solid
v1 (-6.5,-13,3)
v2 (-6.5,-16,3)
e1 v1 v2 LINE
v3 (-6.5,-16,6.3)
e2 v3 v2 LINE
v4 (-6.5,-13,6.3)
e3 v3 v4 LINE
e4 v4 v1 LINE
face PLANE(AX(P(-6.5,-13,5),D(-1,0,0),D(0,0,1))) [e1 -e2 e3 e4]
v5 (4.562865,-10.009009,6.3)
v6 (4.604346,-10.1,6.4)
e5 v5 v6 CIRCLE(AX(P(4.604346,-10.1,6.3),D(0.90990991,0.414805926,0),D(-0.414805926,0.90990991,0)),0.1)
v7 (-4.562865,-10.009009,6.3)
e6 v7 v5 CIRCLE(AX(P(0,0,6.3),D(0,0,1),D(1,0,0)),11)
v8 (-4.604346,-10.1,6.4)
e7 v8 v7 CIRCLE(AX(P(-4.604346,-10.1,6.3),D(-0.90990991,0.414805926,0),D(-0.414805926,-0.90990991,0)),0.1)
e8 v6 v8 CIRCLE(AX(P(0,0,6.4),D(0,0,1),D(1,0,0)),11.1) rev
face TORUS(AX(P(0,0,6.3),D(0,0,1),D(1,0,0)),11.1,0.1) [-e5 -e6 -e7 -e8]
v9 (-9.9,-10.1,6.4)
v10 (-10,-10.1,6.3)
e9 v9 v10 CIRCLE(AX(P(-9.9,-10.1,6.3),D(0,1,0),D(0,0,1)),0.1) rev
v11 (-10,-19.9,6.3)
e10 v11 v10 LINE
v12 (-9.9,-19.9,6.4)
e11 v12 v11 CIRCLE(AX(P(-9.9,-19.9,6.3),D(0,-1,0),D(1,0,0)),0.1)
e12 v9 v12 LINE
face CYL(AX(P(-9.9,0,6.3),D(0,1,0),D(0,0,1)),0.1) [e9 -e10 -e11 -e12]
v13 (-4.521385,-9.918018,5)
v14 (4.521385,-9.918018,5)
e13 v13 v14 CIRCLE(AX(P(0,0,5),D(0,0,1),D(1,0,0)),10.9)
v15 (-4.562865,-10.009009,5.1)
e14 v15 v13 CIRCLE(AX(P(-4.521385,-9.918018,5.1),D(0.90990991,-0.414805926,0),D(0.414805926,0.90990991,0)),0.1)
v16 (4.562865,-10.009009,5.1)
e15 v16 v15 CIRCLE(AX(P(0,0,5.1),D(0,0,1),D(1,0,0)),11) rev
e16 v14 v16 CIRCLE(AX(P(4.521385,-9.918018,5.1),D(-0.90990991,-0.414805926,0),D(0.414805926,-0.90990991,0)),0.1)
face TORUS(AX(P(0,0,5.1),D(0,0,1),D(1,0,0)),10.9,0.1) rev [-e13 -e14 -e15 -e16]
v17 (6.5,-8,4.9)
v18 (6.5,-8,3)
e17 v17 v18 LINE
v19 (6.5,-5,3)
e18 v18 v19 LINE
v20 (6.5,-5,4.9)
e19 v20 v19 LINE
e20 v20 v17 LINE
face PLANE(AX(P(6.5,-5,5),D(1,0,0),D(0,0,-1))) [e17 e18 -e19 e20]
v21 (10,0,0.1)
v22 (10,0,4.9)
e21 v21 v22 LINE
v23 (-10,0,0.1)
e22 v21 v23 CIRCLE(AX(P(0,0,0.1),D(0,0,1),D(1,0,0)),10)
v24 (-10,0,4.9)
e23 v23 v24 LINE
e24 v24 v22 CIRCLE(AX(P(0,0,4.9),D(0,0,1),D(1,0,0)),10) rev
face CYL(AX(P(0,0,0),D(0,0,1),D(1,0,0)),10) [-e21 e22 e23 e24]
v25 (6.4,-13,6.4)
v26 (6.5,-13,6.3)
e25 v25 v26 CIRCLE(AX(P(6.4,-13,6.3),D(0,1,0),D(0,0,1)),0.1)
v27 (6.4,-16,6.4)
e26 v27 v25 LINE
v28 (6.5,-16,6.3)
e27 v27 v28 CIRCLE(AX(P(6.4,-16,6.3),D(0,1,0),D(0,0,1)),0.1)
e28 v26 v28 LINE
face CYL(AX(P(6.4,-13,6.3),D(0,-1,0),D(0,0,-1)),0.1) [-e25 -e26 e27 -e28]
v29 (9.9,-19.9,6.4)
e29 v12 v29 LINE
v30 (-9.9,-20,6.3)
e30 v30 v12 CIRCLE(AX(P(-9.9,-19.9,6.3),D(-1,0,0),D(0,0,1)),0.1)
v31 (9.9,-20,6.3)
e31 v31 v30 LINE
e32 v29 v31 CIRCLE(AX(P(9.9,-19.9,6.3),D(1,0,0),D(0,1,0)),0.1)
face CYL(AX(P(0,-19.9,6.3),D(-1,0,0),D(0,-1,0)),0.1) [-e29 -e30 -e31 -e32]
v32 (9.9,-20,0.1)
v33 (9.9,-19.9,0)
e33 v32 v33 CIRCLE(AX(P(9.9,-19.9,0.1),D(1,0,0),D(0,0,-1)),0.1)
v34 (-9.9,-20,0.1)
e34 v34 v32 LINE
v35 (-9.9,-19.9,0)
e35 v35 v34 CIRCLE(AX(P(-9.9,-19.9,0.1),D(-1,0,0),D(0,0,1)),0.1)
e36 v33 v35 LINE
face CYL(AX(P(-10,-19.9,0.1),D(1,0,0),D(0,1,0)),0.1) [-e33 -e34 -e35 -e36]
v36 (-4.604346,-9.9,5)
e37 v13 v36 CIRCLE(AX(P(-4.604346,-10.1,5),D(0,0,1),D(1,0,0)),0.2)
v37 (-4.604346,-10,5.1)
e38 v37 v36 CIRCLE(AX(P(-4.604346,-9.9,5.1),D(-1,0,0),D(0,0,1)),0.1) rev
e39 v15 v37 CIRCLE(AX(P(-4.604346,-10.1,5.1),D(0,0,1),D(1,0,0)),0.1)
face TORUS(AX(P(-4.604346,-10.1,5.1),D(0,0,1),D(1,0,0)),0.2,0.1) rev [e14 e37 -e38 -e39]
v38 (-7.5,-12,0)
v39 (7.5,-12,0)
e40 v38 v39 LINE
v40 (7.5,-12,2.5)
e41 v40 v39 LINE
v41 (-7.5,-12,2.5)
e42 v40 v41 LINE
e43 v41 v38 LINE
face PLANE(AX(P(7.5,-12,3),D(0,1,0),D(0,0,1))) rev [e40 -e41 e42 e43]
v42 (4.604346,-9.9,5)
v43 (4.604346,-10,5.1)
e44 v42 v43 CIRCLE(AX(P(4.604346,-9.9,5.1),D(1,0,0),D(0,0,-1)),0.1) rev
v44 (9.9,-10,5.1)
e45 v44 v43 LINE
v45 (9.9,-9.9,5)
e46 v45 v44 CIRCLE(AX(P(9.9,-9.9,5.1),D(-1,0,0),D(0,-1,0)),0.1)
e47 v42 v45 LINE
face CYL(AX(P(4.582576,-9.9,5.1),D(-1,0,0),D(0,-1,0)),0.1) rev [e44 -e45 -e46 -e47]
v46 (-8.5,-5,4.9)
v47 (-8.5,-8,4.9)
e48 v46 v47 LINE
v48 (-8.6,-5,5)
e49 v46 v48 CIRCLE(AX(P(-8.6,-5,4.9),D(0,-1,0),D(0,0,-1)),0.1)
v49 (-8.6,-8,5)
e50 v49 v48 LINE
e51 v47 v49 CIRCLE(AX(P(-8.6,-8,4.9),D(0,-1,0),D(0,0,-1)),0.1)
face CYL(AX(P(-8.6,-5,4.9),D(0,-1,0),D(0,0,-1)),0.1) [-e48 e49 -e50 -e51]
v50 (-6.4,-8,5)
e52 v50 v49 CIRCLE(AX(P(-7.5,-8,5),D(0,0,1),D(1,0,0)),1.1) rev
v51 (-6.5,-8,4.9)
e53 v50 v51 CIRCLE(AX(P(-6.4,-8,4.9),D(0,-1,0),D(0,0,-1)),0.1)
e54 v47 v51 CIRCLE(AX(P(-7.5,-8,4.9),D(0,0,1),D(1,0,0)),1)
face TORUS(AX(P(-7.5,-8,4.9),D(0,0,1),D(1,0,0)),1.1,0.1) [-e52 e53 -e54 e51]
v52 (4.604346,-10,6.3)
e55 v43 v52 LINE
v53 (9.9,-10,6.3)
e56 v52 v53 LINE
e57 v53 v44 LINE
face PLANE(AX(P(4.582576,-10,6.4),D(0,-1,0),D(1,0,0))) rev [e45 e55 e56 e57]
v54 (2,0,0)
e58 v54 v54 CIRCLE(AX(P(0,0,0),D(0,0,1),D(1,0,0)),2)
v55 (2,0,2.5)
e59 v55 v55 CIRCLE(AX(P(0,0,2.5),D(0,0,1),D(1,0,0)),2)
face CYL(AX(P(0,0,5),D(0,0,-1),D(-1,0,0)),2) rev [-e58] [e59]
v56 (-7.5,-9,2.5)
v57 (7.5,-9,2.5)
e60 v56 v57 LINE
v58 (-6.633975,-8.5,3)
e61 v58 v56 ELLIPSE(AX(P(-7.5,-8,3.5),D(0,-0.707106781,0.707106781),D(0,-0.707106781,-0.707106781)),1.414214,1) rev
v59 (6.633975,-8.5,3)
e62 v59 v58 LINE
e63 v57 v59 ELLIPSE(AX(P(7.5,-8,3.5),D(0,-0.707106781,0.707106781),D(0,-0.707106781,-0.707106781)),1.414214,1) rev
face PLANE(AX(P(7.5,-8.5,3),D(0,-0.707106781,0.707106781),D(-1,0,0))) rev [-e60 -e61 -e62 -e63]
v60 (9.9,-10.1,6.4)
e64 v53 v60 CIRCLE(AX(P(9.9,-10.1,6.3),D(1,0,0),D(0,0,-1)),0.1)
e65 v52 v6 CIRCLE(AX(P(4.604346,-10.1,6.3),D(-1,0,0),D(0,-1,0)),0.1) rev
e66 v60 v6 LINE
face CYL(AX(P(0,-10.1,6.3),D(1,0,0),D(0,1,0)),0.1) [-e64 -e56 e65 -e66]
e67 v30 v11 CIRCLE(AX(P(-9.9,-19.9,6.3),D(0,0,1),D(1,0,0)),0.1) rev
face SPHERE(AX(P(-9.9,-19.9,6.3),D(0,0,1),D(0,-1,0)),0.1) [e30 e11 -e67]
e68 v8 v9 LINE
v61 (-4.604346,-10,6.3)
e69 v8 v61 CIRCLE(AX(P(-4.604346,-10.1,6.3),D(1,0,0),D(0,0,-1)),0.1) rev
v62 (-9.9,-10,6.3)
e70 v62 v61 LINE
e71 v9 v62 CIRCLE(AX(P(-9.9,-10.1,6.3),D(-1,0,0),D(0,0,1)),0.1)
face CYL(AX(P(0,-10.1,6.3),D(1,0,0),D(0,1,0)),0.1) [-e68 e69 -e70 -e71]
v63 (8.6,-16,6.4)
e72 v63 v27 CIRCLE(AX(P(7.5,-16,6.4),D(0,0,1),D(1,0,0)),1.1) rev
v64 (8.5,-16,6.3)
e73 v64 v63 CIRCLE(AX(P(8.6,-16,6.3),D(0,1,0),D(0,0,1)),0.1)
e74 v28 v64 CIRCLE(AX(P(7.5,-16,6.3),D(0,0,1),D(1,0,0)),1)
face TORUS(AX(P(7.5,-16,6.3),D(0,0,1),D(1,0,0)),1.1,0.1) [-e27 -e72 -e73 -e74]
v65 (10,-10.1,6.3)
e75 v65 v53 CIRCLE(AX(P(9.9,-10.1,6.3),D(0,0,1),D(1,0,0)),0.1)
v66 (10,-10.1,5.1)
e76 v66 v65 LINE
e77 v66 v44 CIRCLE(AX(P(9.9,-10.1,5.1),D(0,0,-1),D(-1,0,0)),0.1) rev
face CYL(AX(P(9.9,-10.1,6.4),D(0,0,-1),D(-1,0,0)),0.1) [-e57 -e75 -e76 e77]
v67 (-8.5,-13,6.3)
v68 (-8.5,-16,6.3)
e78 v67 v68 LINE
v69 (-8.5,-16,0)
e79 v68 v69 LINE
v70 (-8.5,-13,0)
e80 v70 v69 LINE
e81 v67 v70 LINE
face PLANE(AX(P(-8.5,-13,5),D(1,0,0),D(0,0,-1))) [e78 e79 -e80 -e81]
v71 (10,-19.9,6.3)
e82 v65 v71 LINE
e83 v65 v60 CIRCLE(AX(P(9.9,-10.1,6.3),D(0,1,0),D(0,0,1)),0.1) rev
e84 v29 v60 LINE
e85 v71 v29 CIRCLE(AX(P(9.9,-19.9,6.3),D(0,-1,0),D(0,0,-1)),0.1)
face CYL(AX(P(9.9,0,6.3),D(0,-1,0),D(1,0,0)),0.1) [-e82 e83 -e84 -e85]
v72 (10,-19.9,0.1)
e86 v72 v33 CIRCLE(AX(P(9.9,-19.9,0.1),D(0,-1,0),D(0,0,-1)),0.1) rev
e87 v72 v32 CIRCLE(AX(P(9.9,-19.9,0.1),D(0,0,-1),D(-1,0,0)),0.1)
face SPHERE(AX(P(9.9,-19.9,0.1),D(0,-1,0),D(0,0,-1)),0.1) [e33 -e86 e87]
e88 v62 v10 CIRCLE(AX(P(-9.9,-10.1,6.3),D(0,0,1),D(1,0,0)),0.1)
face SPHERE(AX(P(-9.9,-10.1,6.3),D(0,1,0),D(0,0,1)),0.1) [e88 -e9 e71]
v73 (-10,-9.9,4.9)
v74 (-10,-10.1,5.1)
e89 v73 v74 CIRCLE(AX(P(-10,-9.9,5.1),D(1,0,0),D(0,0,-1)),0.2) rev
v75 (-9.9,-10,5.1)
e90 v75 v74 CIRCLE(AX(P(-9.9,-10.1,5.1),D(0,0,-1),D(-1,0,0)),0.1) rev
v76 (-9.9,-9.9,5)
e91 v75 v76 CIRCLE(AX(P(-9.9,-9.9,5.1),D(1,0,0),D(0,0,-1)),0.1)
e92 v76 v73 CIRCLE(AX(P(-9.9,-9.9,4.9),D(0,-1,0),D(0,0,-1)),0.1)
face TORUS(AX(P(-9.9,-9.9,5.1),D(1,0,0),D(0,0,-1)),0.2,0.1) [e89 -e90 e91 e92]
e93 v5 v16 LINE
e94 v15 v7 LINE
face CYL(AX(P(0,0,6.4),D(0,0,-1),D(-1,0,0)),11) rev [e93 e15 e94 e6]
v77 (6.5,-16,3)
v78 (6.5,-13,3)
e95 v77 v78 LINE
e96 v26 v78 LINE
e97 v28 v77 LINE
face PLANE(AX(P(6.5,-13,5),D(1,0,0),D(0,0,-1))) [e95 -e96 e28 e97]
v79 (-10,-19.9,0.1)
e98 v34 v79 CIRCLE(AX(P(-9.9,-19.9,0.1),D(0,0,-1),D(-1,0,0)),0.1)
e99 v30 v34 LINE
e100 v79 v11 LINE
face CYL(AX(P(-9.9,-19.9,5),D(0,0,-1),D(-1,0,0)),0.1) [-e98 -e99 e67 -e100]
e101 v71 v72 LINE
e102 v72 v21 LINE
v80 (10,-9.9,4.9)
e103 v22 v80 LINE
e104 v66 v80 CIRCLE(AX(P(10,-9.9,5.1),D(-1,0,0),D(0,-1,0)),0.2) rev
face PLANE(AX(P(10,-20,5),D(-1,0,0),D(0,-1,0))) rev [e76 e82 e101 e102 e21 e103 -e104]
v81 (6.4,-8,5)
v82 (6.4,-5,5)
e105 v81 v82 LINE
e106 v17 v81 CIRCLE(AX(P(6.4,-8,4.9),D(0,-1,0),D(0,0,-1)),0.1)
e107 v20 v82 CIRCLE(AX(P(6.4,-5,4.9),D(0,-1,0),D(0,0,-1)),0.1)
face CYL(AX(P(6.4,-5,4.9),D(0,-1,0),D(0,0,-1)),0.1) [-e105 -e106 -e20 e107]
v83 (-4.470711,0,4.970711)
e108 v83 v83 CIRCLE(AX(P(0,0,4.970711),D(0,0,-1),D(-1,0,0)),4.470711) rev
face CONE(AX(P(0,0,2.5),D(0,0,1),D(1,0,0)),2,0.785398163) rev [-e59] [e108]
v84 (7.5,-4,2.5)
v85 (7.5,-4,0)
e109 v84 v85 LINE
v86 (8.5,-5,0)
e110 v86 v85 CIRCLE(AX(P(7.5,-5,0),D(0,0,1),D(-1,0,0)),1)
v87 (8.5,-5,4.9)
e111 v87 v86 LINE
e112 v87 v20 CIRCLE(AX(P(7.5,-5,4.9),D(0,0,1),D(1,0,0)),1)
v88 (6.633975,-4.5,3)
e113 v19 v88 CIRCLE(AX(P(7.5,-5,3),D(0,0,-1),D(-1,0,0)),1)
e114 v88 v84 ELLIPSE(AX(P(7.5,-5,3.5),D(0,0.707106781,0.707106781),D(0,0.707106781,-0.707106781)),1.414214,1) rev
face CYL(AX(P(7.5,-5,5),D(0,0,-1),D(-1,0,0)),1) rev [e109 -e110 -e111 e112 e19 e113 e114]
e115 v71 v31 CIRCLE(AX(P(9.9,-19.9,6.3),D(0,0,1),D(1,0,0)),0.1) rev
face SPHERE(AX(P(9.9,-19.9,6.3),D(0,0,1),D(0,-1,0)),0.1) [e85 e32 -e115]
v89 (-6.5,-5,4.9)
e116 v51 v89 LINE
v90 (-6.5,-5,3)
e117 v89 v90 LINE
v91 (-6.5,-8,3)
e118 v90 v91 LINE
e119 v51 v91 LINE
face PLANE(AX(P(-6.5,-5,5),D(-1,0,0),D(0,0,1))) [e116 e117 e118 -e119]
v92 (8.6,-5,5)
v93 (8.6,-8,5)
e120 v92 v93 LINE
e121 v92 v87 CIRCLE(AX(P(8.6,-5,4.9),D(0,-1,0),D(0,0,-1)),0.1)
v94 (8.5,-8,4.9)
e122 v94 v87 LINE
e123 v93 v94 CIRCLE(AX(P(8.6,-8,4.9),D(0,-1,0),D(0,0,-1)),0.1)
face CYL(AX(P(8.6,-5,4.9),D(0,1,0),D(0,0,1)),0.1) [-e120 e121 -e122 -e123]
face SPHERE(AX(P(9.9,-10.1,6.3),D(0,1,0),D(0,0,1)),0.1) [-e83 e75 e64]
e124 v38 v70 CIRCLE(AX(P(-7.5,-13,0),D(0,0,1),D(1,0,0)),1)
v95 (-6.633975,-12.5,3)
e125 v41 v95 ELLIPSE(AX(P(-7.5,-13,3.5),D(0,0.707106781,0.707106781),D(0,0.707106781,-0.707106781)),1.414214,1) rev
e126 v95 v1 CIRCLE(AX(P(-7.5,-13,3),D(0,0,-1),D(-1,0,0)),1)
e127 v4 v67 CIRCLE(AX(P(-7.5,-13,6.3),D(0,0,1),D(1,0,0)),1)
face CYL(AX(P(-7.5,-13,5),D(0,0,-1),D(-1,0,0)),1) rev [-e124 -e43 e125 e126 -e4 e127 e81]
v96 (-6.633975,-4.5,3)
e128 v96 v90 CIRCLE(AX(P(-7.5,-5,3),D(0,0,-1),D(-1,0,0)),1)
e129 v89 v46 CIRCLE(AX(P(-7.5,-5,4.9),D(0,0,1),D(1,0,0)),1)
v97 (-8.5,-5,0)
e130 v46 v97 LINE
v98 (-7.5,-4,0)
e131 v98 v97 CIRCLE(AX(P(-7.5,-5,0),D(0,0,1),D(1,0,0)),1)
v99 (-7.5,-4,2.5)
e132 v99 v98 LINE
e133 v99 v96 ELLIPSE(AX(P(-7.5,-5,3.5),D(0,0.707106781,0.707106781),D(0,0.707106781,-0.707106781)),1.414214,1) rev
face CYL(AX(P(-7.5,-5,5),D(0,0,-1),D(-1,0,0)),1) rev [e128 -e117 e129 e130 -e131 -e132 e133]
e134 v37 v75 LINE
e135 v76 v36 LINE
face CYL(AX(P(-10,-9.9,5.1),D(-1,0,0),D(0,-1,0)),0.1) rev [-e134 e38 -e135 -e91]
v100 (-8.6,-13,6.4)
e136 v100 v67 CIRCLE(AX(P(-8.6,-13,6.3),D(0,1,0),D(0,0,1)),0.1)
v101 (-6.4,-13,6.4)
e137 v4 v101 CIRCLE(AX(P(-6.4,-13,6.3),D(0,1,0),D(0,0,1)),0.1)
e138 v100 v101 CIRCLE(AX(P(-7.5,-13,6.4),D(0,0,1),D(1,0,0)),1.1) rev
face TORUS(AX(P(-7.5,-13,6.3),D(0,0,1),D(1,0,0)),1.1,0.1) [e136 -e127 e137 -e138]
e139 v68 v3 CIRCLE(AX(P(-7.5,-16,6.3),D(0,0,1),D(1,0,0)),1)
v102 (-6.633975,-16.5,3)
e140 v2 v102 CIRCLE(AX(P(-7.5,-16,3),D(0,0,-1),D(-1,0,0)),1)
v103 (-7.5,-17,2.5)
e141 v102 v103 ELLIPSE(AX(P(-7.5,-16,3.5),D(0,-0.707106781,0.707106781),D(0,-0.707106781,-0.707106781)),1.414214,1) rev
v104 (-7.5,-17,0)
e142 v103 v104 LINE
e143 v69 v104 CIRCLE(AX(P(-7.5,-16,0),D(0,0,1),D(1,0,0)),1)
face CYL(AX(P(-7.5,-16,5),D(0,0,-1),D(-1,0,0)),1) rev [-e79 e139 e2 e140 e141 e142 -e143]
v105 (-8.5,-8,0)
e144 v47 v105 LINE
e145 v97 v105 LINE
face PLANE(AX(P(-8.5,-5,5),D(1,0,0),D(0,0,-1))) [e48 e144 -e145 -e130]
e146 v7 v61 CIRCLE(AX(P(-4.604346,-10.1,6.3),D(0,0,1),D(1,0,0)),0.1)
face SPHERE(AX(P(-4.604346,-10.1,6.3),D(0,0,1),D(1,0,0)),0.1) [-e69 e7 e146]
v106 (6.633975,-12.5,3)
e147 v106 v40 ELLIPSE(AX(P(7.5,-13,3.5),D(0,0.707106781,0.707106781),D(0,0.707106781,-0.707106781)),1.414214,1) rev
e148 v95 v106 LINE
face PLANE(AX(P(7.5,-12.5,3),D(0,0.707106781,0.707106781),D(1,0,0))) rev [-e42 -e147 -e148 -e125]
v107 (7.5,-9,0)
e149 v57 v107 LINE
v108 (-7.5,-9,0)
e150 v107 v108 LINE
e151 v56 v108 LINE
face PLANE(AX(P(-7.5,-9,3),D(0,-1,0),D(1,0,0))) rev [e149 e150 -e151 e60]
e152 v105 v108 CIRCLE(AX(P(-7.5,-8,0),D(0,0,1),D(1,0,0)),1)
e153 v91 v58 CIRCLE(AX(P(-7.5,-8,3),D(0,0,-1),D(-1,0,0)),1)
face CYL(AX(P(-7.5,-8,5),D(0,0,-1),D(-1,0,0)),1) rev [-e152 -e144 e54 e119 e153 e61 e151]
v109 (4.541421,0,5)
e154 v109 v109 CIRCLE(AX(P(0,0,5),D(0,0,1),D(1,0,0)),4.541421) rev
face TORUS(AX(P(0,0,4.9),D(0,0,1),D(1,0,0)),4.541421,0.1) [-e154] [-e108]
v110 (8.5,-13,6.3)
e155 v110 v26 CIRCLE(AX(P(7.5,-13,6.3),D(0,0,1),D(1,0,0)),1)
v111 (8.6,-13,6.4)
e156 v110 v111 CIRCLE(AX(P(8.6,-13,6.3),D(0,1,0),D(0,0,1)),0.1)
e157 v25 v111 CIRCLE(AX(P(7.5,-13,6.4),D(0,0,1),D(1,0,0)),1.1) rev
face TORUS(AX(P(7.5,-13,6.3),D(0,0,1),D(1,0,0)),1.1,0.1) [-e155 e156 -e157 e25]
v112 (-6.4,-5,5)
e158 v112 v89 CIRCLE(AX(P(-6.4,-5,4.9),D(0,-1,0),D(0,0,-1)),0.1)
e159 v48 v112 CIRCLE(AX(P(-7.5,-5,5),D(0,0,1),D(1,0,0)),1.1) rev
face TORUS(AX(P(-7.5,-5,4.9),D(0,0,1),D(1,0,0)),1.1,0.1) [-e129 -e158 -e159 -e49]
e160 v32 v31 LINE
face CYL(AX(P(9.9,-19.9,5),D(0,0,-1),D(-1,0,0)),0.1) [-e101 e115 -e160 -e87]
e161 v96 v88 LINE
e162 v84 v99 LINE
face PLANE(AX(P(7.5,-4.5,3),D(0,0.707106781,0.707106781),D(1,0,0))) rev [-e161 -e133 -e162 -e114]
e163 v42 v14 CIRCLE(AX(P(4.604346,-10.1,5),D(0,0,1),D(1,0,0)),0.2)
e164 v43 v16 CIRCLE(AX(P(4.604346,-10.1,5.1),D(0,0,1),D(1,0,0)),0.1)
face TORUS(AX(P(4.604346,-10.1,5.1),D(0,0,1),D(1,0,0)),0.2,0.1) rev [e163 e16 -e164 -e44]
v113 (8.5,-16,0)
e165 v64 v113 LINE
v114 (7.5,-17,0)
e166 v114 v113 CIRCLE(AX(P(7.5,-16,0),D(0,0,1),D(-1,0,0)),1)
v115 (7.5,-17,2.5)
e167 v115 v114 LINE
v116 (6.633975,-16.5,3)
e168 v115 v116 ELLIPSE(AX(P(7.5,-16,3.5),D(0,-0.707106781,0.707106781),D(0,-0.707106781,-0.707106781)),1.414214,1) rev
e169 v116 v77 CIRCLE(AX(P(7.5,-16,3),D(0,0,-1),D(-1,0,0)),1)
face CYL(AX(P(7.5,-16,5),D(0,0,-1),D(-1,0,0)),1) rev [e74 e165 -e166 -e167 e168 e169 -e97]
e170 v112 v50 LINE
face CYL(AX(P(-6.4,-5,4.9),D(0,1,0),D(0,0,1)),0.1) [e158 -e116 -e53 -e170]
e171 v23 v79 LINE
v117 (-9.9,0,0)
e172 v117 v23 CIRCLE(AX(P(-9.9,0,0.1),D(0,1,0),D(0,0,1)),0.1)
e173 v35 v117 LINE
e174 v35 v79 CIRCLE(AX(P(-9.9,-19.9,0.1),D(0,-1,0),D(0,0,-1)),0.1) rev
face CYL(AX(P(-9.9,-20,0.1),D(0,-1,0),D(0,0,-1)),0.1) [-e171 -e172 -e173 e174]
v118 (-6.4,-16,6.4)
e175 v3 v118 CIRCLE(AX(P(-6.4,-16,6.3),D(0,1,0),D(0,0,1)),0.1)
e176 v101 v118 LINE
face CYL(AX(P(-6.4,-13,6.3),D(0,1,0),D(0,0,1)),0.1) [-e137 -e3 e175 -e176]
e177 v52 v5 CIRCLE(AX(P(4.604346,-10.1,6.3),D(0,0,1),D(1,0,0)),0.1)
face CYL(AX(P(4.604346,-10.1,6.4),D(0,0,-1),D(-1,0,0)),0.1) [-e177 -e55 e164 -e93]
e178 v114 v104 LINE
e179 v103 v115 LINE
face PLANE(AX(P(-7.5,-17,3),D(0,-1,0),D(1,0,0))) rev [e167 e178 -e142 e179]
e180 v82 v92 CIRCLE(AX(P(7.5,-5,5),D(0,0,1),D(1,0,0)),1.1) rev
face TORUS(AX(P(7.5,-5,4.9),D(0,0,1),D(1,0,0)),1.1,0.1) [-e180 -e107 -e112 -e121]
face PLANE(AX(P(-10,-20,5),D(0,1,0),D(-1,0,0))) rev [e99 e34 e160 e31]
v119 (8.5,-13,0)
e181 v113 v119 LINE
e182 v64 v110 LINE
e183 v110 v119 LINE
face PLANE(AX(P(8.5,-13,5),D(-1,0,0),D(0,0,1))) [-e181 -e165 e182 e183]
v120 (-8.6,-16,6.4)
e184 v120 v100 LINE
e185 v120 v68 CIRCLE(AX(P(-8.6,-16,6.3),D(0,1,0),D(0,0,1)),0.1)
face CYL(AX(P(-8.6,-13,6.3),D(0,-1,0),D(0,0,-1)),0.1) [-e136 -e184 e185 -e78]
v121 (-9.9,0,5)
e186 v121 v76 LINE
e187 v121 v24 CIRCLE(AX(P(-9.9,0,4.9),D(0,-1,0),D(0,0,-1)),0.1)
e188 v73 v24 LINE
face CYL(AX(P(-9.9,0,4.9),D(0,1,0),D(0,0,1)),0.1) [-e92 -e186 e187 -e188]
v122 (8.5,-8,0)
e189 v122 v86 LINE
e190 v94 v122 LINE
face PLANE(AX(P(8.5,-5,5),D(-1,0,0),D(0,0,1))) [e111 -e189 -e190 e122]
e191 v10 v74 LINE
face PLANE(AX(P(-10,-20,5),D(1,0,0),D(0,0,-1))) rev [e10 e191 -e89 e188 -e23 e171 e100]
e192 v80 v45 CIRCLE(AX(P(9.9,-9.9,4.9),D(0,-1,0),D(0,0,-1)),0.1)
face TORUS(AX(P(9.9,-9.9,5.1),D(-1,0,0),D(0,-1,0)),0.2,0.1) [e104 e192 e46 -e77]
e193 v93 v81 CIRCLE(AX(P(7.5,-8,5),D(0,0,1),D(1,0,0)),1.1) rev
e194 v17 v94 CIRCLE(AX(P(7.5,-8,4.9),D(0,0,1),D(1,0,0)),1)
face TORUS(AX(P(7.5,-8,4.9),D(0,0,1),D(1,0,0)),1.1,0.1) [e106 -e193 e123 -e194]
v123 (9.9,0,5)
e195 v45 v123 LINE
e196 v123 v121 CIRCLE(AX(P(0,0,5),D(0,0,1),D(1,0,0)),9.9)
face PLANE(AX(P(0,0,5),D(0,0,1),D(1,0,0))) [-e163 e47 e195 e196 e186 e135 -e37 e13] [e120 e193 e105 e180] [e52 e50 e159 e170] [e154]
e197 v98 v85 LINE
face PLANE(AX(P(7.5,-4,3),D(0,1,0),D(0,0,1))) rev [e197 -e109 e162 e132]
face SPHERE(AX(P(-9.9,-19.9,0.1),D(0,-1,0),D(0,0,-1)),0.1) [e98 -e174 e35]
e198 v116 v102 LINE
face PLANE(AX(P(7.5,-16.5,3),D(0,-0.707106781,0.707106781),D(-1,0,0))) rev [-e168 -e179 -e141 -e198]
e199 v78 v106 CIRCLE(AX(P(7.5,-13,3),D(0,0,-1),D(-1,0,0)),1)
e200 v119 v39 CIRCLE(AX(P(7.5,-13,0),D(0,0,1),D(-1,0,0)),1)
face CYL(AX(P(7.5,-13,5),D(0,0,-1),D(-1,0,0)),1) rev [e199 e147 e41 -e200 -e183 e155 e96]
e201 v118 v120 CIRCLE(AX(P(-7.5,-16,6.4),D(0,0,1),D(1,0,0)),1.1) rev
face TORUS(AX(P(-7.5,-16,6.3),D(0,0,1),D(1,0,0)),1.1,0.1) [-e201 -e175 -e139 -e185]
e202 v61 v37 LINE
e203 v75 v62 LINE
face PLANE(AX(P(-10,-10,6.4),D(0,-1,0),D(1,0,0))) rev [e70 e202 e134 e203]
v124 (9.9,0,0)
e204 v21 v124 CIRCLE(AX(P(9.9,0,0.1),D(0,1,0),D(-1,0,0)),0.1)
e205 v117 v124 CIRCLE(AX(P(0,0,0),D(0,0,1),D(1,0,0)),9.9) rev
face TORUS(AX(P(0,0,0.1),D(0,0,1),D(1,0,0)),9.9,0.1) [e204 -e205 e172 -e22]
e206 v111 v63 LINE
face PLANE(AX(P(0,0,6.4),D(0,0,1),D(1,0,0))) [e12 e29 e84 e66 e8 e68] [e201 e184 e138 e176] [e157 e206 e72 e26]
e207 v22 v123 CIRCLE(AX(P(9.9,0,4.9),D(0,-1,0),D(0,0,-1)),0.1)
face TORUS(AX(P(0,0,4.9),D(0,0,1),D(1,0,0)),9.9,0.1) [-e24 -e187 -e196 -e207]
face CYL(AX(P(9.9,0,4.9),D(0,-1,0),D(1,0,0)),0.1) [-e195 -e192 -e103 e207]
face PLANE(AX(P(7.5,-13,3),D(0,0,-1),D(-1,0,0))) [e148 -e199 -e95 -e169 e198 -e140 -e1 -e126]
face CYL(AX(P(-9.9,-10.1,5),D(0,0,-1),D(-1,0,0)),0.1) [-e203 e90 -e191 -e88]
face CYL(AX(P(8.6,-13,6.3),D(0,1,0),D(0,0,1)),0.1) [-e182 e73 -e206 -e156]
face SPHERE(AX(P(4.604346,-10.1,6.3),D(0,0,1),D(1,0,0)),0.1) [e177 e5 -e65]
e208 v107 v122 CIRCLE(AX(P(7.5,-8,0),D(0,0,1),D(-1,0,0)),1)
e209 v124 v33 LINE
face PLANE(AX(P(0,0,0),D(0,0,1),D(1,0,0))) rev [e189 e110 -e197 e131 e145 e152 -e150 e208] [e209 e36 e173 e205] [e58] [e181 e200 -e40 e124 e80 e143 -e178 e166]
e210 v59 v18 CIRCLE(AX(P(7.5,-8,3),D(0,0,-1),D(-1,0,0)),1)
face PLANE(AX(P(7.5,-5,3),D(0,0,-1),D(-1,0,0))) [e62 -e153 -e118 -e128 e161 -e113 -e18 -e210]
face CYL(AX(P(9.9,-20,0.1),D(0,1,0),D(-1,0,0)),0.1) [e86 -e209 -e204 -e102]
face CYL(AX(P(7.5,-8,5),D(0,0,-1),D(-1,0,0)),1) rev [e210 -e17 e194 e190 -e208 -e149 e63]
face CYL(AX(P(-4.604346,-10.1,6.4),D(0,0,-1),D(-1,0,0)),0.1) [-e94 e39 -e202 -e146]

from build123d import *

# Parameters (mm, degrees)
SKETCH1_W           = 20
SKETCH1_H           = 30
SKETCH1_R           = 2
BOSS_EXTRUDE1_DEPTH = 5
CHAMFER1_SIZE       = 2.5
BOSS_EXTRUDE2_DEPTH = 1.4
CUT_EXTRUDE1_DEPTH  = 3
CHAMFER2_SIZE       = 0.5
CUT_EXTRUDE2_DEPTH  = 23.912878475
FILLET1_R           = 0.1


with BuildPart() as part:
    # Sketch1 → Boss-Extrude1 (new body)
    with BuildSketch(Plane.XY):
        with Locations((0, -5)):
            Rectangle(SKETCH1_W, SKETCH1_H)
        Circle(SKETCH1_R, mode=Mode.SUBTRACT)
        with BuildLine():
            Line((-6.5, -13), (-6.5, -16))
            ThreePointArc((-6.5, -16), (-7.5, -17), (-8.5, -16))
            Line((-8.5, -16), (-8.5, -13))
            ThreePointArc((-8.5, -13), (-7.5, -12), (-6.5, -13))
        make_face(mode=Mode.SUBTRACT)
        with BuildLine():
            Line((6.5, -13), (6.5, -16))
            ThreePointArc((6.5, -16), (7.5, -17), (8.5, -16))
            Line((8.5, -16), (8.5, -13))
            ThreePointArc((8.5, -13), (7.5, -12), (6.5, -13))
        make_face(mode=Mode.SUBTRACT)
        with BuildLine():
            Line((-8.5, -5), (-8.5, -8))
            ThreePointArc((-8.5, -8), (-7.5, -9), (-6.5, -8))
            Line((-6.5, -8), (-6.5, -5))
            ThreePointArc((-6.5, -5), (-7.5, -4), (-8.5, -5))
        make_face(mode=Mode.SUBTRACT)
        with BuildLine():
            Line((6.5, -5), (6.5, -8))
            ThreePointArc((6.5, -8), (7.5, -9), (8.5, -8))
            Line((8.5, -8), (8.5, -5))
            ThreePointArc((8.5, -5), (7.5, -4), (6.5, -5))
        make_face(mode=Mode.SUBTRACT)
    extrude(amount=BOSS_EXTRUDE1_DEPTH)

    # Chamfer1
    chamfer1_edges = [part.edges().sort_by_distance(p)[0] for p in [
        (-2, 0, 5),
    ]]
    chamfer(chamfer1_edges, length=CHAMFER1_SIZE)

    # Sketch2 → Boss-Extrude2 (add)
    with BuildSketch(Plane.XY.offset(5)):
        with BuildLine():
            Line((-10, -20), (10, -20))
            Line((10, -20), (10, -10))
            Line((10, -10), (4.582575695, -10))
            ThreePointArc((4.582575695, -10), (0, -11), (-4.582575695, -10))
            Line((-4.582575695, -10), (-10, -10))
            Line((-10, -10), (-10, -20))
        make_face()
        with BuildLine():
            Line((-8.5, -13), (-8.5, -16))
            ThreePointArc((-8.5, -16), (-7.5, -17), (-6.5, -16))
            Line((-6.5, -16), (-6.5, -13))
            ThreePointArc((-6.5, -13), (-7.5, -12), (-8.5, -13))
        make_face(mode=Mode.SUBTRACT)
        with BuildLine():
            Line((8.5, -16), (8.5, -13))
            ThreePointArc((8.5, -13), (7.5, -12), (6.5, -13))
            Line((6.5, -13), (6.5, -16))
            ThreePointArc((6.5, -16), (7.5, -17), (8.5, -16))
        make_face(mode=Mode.SUBTRACT)
    extrude(amount=BOSS_EXTRUDE2_DEPTH)

    # Sketch3 → Cut-Extrude1 (cut)
    with BuildSketch(Plane(origin=(0, 0, 0), x_dir=(-1, 0, 0), z_dir=(0, 0, -1))):
        with BuildLine():
            Line((-7.5, -12), (7.5, -12))
            ThreePointArc((7.5, -12), (8.207106781, -12.292893219), (8.5, -13))
            Line((8.5, -13), (8.5, -16))
            ThreePointArc((8.5, -16), (8.207106781, -16.707106781), (7.5, -17))
            Line((7.5, -17), (-7.5, -17))
            ThreePointArc((-7.5, -17), (-8.207106781, -16.707106781), (-8.5, -16))
            Line((-8.5, -16), (-8.5, -13))
            ThreePointArc((-8.5, -13), (-8.207106781, -12.292893219), (-7.5, -12))
        make_face()
        with BuildLine():
            Line((-8.5, -8), (-8.5, -5))
            ThreePointArc((-8.5, -5), (-8.207106781, -4.292893219), (-7.5, -4))
            Line((-7.5, -4), (7.5, -4))
            ThreePointArc((7.5, -4), (8.207106781, -4.292893219), (8.5, -5))
            Line((8.5, -5), (8.5, -8))
            ThreePointArc((8.5, -8), (8.207106781, -8.707106781), (7.5, -9))
            Line((7.5, -9), (-7.5, -9))
            ThreePointArc((-7.5, -9), (-8.207106781, -8.707106781), (-8.5, -8))
        make_face()
    extrude(amount=-CUT_EXTRUDE1_DEPTH, mode=Mode.SUBTRACT)

    # Chamfer2
    # the kernel refuses this chamfer: 0.5 mm, written as the material it adds along each edge
    with BuildSketch(Plane(origin=(8.785841494, -12, 3), x_dir=(0, -0.9996219169112968, 0.02749587661058651), z_dir=(-1, 0, 0))) as chamfer2_piece_1_section:
        Polygon((CHAMFER2_SIZE * 0.999621916911, -CHAMFER2_SIZE * 0.0274958766106), (-CHAMFER2_SIZE * 0.0274958766106, -CHAMFER2_SIZE * 0.999621916911), (0, 0), align=None)
    chamfer2_piece_1 = extrude(amount=17.571682988, mode=Mode.PRIVATE)
    chamfer2_piece_1 = chamfer2_piece_1 - Plane(origin=(7.5, -13, 2.831391478), x_dir=(1, 0, 0), z_dir=(0, 0, -1)) * Cylinder(1, 38, mode=Mode.PRIVATE)
    chamfer2_piece_1 = chamfer2_piece_1 - Plane(origin=(-7.5, -13, 2.831391478), x_dir=(-1, 0, 0), z_dir=(0, 0, -1)) * Cylinder(1, 38, mode=Mode.PRIVATE)
    add(chamfer2_piece_1)
    with BuildSketch(Plane(origin=(-8.785841494, -17, 3), x_dir=(0, 0.9996219169112968, 0.027495876610586414), z_dir=(1, 0, 0))) as chamfer2_piece_2_section:
        Polygon((CHAMFER2_SIZE * 0.999621916911, -CHAMFER2_SIZE * 0.0274958766106), (-CHAMFER2_SIZE * 0.0274958766106, -CHAMFER2_SIZE * 0.999621916911), (0, 0), align=None)
    chamfer2_piece_2 = extrude(amount=17.571682988, mode=Mode.PRIVATE)
    chamfer2_piece_2 = chamfer2_piece_2 - Plane(origin=(7.5, -16, 2.831391478), x_dir=(-1, 0, 0), z_dir=(0, 0, -1)) * Cylinder(1, 38, mode=Mode.PRIVATE)
    chamfer2_piece_2 = chamfer2_piece_2 - Plane(origin=(-7.5, -16, 2.831391478), x_dir=(1, 0, 0), z_dir=(0, 0, -1)) * Cylinder(1, 38, mode=Mode.PRIVATE)
    add(chamfer2_piece_2)
    with BuildSketch(Plane(origin=(8.785841494, -4, 3), x_dir=(0, 0.027495876610586487, -0.9996219169112968), z_dir=(-1, 0, 0))) as chamfer2_piece_3_section:
        Polygon((CHAMFER2_SIZE * 0.999621916911, CHAMFER2_SIZE * 0.0274958766106), (-CHAMFER2_SIZE * 0.0274958766106, CHAMFER2_SIZE * 0.999621916911), (0, 0), align=None)
    chamfer2_piece_3 = extrude(amount=17.571682988, mode=Mode.PRIVATE)
    chamfer2_piece_3 = chamfer2_piece_3 - Plane(origin=(-7.5, -5, 2.831391479), x_dir=(1, 0, 0), z_dir=(0, 0, -1)) * Cylinder(1, 38, mode=Mode.PRIVATE)
    chamfer2_piece_3 = chamfer2_piece_3 - Plane(origin=(7.5, -5, 2.831391479), x_dir=(1, 0, 0), z_dir=(0, 0, -1)) * Cylinder(1, 38, mode=Mode.PRIVATE)
    add(chamfer2_piece_3)
    with BuildSketch(Plane(origin=(-8.785841494, -9, 3), x_dir=(0, 0.9996219169112968, 0.02749587661058651), z_dir=(1, 0, 0))) as chamfer2_piece_4_section:
        Polygon((CHAMFER2_SIZE * 0.999621916911, -CHAMFER2_SIZE * 0.0274958766106), (-CHAMFER2_SIZE * 0.0274958766106, -CHAMFER2_SIZE * 0.999621916911), (0, 0), align=None)
    chamfer2_piece_4 = extrude(amount=17.571682988, mode=Mode.PRIVATE)
    chamfer2_piece_4 = chamfer2_piece_4 - Plane(origin=(-7.5, -8, 2.831391478), x_dir=(-1, 0, 0), z_dir=(0, 0, -1)) * Cylinder(1, 38, mode=Mode.PRIVATE)
    chamfer2_piece_4 = chamfer2_piece_4 - Plane(origin=(7.5, -8, 2.831391478), x_dir=(-1, 0, 0), z_dir=(0, 0, -1)) * Cylinder(1, 38, mode=Mode.PRIVATE)
    add(chamfer2_piece_4)

    # Sketch6 → Cut-Extrude2 (cut, through all)
    with BuildSketch(Plane.XY.offset(5)):
        with BuildLine():
            ThreePointArc((-10, 0), (-7.071067803, 7.071067821), (2.6e-08, 10))
            Line((2.6e-08, 10), (-10, 10))
            Line((-10, 10), (-10, 0))
        make_face()
        with BuildLine():
            Line((10, 0), (10, 10))
            Line((10, 10), (2.6e-08, 10))
            ThreePointArc((2.6e-08, 10), (7.071067821, 7.071067803), (10, 0))
        make_face()
    extrude(amount=-CUT_EXTRUDE2_DEPTH, mode=Mode.SUBTRACT)

    # Fillet1
    fillet1_edges = [part.edges().sort_by_distance(p)[0] for p in [
        (-10, -10, 0),
        (-10, -5, 5),
        (0, 10, 5),
        (0, 10, 0),
        (-7.5, -4, 5),
        (-8.5, -6.5, 5),
        (-7.5, -9, 5),
        (-6.5, -6.5, 5),
        (10, -10, 0),
        (0, -20, 0),
        (7.5, -4, 5),
        (6.5, -6.5, 5),
        (7.5, -9, 5),
        (8.5, -6.5, 5),
        (-4.5, 0, 5),
        (10, -20, 3.2),
        (-10, -20, 3.2),
        (10, -5, 5),
        (-10, -15, 6.4),
        (0, -20, 6.4),
        (10, -15, 6.4),
        (7.291287847, -10, 6.4),
        (0, -11, 6.4),
        (-7.291287847, -10, 6.4),
        (-10, -10, 5.7),
        (7.291287847, -10, 5),
        (10, -10, 5.7),
        (0, -11, 5),
        (4.582575695, -10, 5.7),
        (-7.291287847, -10, 5),
        (-4.582575695, -10, 5.7),
        (7.5, -17, 6.4),
        (8.5, -14.5, 6.4),
        (7.5, -12, 6.4),
        (6.5, -14.5, 6.4),
        (-7.5, -17, 6.4),
        (-6.5, -14.5, 6.4),
        (-7.5, -12, 6.4),
        (-8.5, -14.5, 6.4),
    ]]
    fillet(fillet1_edges, radius=FILLET1_R)


solid = part.part
